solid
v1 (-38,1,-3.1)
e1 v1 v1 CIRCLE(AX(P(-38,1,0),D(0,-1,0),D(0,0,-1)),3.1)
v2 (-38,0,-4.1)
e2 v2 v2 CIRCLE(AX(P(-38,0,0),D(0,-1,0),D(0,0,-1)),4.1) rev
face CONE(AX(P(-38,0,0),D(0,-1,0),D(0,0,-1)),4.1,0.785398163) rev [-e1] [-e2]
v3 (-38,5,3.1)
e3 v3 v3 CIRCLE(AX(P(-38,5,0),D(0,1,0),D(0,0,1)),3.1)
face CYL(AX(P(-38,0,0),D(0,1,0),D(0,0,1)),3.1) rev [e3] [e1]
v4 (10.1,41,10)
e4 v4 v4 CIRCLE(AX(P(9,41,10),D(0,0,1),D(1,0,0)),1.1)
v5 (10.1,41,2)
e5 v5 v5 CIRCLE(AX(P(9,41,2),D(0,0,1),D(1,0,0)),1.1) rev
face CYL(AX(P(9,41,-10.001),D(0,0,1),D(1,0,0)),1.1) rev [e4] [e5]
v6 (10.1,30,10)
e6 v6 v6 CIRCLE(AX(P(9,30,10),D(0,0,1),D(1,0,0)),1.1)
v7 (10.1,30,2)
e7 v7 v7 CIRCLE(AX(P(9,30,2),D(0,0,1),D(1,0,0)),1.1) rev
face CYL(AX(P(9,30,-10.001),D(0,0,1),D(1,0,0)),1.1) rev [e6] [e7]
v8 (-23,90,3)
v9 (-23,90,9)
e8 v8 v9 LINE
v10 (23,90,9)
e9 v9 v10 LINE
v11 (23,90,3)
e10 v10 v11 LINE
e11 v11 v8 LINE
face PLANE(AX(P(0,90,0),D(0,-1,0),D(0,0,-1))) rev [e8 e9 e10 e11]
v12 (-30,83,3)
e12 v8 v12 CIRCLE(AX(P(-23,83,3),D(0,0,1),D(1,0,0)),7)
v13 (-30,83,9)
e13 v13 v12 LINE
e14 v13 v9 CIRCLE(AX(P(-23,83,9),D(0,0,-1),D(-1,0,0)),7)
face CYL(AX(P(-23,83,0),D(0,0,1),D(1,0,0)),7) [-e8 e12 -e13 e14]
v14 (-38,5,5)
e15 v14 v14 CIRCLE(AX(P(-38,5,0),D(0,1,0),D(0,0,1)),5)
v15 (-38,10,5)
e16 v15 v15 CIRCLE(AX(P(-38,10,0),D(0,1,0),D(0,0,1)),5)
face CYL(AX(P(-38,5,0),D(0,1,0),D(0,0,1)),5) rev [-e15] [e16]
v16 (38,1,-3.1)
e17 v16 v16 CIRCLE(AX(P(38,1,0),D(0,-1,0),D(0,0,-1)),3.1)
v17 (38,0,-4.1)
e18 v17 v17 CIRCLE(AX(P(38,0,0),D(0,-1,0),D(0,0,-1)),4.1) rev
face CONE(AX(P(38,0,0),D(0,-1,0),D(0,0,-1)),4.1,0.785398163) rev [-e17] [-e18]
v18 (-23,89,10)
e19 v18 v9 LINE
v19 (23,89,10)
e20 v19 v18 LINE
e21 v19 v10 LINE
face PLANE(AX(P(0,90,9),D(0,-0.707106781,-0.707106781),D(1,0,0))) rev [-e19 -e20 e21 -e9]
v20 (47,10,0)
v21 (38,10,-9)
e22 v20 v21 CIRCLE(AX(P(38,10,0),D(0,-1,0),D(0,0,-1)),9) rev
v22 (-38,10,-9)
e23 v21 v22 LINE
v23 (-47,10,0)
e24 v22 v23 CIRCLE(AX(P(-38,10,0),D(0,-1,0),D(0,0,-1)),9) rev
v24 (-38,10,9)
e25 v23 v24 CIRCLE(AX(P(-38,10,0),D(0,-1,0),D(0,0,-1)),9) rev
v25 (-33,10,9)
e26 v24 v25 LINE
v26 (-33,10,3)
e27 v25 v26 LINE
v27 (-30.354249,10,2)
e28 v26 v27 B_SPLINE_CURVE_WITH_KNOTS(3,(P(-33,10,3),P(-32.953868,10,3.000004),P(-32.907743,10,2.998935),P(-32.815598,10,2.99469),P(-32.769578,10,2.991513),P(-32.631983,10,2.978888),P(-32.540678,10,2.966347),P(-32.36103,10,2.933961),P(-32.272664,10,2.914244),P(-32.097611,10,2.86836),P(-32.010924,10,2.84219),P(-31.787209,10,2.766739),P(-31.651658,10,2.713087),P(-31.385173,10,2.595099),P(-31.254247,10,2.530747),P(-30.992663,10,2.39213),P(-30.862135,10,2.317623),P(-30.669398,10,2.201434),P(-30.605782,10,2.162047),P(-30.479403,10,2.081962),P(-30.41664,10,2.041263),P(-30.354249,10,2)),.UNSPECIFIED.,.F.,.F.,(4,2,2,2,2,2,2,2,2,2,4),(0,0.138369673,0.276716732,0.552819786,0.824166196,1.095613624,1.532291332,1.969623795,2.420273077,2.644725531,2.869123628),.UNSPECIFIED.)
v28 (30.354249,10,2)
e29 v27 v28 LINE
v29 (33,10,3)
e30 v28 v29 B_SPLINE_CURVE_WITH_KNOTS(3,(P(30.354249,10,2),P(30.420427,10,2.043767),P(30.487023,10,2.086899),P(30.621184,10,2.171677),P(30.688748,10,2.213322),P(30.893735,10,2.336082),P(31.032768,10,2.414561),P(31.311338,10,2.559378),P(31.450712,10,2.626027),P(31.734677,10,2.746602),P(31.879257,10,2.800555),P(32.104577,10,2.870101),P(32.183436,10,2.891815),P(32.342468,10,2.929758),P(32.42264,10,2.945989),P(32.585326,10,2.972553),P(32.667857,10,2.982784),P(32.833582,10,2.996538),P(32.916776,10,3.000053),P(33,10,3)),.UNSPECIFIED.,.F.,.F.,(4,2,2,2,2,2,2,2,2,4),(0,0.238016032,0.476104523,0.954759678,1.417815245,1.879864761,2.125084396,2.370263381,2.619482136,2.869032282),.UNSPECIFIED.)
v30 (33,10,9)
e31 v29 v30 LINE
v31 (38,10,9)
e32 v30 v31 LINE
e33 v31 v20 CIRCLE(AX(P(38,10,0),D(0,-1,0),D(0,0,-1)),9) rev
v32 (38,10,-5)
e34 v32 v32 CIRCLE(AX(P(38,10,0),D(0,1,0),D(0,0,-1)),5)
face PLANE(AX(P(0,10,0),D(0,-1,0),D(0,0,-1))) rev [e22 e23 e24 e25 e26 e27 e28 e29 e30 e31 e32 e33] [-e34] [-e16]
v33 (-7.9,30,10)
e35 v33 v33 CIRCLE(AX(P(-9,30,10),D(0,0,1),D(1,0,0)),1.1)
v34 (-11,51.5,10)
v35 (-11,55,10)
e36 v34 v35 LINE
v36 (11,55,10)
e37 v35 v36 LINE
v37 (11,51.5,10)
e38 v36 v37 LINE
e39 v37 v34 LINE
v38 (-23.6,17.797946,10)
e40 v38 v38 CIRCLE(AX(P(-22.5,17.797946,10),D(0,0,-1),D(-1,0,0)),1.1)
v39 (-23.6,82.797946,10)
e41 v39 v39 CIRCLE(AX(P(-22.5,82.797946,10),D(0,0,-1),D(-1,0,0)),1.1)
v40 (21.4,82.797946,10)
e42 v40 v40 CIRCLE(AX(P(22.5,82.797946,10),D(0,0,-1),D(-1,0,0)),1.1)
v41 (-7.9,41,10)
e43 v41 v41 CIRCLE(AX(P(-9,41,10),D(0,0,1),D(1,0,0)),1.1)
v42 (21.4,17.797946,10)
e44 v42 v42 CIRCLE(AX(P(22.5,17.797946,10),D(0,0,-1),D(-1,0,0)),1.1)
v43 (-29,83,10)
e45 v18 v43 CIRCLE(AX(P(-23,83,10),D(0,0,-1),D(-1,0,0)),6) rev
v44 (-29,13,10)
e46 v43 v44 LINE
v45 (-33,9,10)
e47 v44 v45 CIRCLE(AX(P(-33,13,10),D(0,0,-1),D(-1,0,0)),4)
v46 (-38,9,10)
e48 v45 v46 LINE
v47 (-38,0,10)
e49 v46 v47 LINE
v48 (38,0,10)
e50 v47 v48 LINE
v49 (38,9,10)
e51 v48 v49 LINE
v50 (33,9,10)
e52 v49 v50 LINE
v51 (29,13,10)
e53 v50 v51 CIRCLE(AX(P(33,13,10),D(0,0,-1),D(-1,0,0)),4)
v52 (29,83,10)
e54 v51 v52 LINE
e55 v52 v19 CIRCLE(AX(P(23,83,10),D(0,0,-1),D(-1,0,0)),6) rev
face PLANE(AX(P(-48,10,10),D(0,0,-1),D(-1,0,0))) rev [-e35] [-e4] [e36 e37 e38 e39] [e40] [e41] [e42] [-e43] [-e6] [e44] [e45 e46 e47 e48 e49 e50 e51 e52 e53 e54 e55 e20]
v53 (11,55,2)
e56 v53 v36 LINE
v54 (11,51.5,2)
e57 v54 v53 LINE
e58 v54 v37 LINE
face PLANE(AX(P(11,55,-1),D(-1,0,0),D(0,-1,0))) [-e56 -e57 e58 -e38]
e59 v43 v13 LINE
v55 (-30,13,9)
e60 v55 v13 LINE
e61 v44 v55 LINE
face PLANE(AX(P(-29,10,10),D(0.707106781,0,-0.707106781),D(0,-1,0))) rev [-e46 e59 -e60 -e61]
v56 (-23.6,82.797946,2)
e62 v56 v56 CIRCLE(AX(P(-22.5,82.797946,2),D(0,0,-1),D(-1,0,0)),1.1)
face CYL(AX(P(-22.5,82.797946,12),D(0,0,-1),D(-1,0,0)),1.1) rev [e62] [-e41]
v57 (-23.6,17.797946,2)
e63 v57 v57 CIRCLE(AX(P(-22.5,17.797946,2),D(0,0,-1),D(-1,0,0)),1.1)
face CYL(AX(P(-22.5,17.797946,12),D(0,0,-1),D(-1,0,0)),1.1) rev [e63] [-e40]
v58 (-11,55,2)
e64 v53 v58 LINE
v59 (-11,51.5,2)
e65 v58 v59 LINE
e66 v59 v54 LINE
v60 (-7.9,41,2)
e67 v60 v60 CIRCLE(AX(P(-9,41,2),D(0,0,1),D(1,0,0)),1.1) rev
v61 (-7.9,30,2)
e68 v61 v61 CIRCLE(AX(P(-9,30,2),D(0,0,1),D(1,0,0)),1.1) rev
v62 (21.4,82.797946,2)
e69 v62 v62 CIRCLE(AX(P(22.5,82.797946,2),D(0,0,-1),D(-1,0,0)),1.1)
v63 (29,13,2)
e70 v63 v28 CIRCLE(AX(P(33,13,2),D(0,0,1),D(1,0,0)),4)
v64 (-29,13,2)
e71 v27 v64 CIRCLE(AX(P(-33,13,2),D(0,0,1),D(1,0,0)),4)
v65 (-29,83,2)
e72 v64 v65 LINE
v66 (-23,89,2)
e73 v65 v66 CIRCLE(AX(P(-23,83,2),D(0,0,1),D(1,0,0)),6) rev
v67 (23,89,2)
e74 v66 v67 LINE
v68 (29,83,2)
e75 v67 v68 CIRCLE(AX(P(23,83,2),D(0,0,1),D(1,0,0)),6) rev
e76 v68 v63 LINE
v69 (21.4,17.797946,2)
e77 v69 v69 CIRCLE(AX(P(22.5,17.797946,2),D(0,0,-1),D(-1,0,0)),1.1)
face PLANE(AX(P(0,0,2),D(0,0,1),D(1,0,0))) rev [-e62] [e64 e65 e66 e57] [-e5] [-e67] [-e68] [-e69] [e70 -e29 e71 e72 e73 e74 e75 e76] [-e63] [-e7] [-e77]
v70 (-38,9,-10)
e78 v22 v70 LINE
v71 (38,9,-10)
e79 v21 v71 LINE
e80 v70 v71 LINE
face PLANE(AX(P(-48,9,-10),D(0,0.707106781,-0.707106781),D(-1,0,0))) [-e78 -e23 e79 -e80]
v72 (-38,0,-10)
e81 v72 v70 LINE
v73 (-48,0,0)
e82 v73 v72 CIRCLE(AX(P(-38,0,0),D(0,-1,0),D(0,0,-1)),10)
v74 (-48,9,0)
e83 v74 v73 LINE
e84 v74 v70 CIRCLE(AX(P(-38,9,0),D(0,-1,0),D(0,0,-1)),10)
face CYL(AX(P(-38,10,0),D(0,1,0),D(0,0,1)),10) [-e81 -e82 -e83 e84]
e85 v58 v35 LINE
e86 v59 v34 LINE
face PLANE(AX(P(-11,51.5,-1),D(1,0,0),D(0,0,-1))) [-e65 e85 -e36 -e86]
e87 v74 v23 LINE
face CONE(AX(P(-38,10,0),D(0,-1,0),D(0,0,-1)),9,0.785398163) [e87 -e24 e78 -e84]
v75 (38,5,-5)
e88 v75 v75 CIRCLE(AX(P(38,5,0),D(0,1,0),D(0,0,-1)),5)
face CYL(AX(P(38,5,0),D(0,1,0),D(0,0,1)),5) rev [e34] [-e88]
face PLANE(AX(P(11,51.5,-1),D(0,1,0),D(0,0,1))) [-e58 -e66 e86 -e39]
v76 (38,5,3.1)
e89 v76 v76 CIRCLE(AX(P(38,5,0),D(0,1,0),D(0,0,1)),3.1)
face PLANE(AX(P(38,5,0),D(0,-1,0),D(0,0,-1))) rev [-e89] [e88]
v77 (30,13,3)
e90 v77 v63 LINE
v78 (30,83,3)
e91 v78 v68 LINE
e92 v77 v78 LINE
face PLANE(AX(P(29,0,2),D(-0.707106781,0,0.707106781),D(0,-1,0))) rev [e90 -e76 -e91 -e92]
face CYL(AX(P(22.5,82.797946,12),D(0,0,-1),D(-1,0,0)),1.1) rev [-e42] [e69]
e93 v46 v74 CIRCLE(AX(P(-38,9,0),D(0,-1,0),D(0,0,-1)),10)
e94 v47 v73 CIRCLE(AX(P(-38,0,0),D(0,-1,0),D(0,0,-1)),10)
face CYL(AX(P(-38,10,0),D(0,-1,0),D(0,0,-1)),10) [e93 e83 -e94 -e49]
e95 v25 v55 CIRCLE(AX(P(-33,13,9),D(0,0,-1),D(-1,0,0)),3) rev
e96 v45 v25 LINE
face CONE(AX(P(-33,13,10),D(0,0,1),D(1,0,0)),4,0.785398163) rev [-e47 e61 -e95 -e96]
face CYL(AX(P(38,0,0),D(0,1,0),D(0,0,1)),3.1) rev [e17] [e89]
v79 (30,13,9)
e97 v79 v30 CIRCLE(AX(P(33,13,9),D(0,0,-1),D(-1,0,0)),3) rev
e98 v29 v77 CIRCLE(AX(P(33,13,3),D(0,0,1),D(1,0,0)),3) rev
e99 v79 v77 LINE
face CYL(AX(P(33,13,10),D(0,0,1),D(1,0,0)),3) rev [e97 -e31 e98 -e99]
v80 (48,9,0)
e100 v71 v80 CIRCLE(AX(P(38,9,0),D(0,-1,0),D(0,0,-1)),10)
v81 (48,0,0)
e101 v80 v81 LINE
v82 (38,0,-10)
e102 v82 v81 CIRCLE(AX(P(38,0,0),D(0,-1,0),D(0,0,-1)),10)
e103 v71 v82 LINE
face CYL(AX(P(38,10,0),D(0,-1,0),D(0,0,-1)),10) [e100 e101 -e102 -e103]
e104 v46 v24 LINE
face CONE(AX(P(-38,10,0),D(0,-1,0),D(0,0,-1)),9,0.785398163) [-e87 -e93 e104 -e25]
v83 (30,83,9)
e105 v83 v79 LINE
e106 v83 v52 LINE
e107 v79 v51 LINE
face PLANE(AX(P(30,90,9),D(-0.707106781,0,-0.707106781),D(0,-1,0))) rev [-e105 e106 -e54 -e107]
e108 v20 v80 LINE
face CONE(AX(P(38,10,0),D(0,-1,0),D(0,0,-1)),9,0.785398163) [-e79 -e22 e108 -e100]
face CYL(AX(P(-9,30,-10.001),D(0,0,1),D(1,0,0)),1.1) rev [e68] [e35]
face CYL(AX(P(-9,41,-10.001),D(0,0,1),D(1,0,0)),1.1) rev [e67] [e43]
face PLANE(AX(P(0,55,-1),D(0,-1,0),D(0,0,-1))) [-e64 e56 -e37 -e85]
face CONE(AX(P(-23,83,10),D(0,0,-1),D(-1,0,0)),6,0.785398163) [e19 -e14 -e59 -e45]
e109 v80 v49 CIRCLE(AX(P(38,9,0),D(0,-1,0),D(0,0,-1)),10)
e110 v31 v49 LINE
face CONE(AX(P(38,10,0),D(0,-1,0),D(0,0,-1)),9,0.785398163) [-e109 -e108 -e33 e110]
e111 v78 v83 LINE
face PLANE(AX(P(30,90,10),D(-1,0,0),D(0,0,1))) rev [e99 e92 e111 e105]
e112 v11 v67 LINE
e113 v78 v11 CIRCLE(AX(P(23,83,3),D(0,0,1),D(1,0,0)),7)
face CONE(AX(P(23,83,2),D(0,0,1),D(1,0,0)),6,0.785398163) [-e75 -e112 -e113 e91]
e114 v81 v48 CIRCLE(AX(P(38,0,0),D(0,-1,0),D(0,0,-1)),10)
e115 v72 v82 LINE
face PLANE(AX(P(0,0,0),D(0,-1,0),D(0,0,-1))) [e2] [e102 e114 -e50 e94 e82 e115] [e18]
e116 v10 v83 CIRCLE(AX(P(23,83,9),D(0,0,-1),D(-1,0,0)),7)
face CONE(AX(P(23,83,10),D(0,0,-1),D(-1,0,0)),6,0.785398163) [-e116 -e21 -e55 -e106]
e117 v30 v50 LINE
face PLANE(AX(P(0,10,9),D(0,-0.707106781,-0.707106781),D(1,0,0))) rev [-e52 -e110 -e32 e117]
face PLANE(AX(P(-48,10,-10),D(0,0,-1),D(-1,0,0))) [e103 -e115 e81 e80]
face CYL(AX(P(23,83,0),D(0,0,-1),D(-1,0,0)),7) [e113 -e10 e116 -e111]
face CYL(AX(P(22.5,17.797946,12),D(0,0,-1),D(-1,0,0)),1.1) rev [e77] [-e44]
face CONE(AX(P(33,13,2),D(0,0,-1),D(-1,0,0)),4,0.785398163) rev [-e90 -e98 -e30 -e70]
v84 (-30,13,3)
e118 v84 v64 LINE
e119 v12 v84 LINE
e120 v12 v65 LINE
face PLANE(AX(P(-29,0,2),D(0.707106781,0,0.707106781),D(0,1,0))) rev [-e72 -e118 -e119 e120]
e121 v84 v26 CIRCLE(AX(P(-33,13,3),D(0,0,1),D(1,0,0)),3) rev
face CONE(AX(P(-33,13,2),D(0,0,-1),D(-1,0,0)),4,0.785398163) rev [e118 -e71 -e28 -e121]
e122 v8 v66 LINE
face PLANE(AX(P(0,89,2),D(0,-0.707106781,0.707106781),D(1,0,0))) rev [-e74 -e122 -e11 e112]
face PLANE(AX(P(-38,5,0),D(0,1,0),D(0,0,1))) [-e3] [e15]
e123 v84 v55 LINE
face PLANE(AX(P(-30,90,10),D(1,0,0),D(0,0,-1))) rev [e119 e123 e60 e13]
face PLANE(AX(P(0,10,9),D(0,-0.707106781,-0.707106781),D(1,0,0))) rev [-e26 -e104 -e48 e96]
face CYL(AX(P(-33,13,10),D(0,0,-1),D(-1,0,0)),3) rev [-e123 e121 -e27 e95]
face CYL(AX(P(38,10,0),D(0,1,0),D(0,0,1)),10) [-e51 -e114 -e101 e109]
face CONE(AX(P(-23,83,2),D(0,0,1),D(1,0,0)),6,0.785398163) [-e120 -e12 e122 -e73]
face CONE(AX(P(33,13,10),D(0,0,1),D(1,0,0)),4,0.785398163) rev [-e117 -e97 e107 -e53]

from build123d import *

# Parameters (mm, degrees)
SKETCH_1_W          = 96
SKETCH_1_H          = 20
EXTRUDE_1_DEPTH     = 10
SKETCH_2_R          = 5
CUT_EXTRUDE_1_DEPTH = 5
FILLET_1_R          = 10
SKETCH_3_R          = 3.1
CUT_EXTRUDE_2_DEPTH = 5
CHAMFER_1_SIZE      = 1
SKETCH_4_W          = 60
SKETCH_4_H          = 20
EXTRUDE_2_DEPTH     = 80
CUT_EXTRUDE_4_REACH = 105.942
SKETCH_6_R          = 1.1
CUT_EXTRUDE_5_DEPTH = 11
SKETCH_8_W          = 60
SKETCH_8_H          = 102
CUT_EXTRUDE_6_DEPTH = 12
SKETCH_9_R          = 1.1
CUT_EXTRUDE_7_DEPTH = 10
FILLET_8_R          = 7
SKETCH_10_W         = 12
SKETCH_10_H         = 10
EXTRUDE_3_DEPTH     = 60
FILLET_11_R         = 3
CHAMFER_4_SIZE      = 1


with BuildPart() as part:
    # 草图1 → 凸台-拉伸1 (new body)
    with BuildSketch(Plane(origin=(0, 0, 0), x_dir=(1, 0, 0), z_dir=(0, 1, 0))):
        Rectangle(SKETCH_1_W, SKETCH_1_H)
    extrude(amount=EXTRUDE_1_DEPTH)

    # 草图2 → 切除-拉伸1 (cut)
    with BuildSketch(Plane(origin=(0, 10, 0), x_dir=(1, 0, 0), z_dir=(0, 1, 0))):
        with Locations(Location((-38, 0, 0), (0, 0, 270))):
            Circle(SKETCH_2_R)
        with Locations(Location((38, 0, 0), (0, 0, 90))):
            Circle(SKETCH_2_R)
    extrude(amount=-CUT_EXTRUDE_1_DEPTH, mode=Mode.SUBTRACT)

    # 圆角1
    fillet_1_edges = [part.edges().sort_by_distance(p)[0] for p in [
        (48, 5, -10),
        (48, 5, 10),
        (-48, 5, 10),
        (-48, 5, -10),
    ]]
    fillet(fillet_1_edges, radius=FILLET_1_R - 0.0001)  # a hair under: the kernel refuses the full size

    # 草图3 → 切除-拉伸2 (cut)
    with BuildSketch(Plane(origin=(0, 5, 0), x_dir=(1, 0, 0), z_dir=(0, 1, 0))):
        with Locations(Location((-38, 0, 0), (0, 0, 270))):
            Circle(SKETCH_3_R)
        with Locations(Location((38, 0, 0), (0, 0, 270))):
            Circle(SKETCH_3_R)
    extrude(amount=-CUT_EXTRUDE_2_DEPTH, mode=Mode.SUBTRACT)

    # 倒角1
    chamfer_1_edges = [part.edges().sort_by_distance(p)[0] for p in [
        (-38, 0, -3.1),
        (38, 0, -3.1),
    ]]
    chamfer(chamfer_1_edges, length=CHAMFER_1_SIZE)

    # 草图4 → 凸台-拉伸2 (add)
    with BuildSketch(Plane(origin=(0, 10, 0), x_dir=(1, 0, 0), z_dir=(0, 1, 0))):
        Rectangle(SKETCH_4_W, SKETCH_4_H)
    extrude(amount=EXTRUDE_2_DEPTH)

    # 草图6 → 切除-拉伸4 (cut, up to next)
    with BuildSketch(Plane.XY.offset(10), mode=Mode.PRIVATE) as cut_extrude_4_sk1:
        with Locations((-9, 41)):
            Circle(SKETCH_6_R)
    cut_extrude_4_tool1 = extrude(cut_extrude_4_sk1.sketch, amount=-CUT_EXTRUDE_4_REACH, mode=Mode.PRIVATE) & part.part
    # 草图6 → 切除-拉伸4 (cut, up to next)
    with BuildSketch(Plane.XY.offset(10), mode=Mode.PRIVATE) as cut_extrude_4_sk2:
        with Locations((9, 41)):
            Circle(SKETCH_6_R)
    cut_extrude_4_tool2 = extrude(cut_extrude_4_sk2.sketch, amount=-CUT_EXTRUDE_4_REACH, mode=Mode.PRIVATE) & part.part
    # 草图6 → 切除-拉伸4 (cut, up to next)
    with BuildSketch(Plane.XY.offset(10), mode=Mode.PRIVATE) as cut_extrude_4_sk3:
        with Locations((9, 30)):
            Circle(SKETCH_6_R)
    cut_extrude_4_tool3 = extrude(cut_extrude_4_sk3.sketch, amount=-CUT_EXTRUDE_4_REACH, mode=Mode.PRIVATE) & part.part
    # 草图6 → 切除-拉伸4 (cut, up to next)
    with BuildSketch(Plane.XY.offset(10), mode=Mode.PRIVATE) as cut_extrude_4_sk4:
        with Locations((-9, 30)):
            Circle(SKETCH_6_R)
    cut_extrude_4_tool4 = extrude(cut_extrude_4_sk4.sketch, amount=-CUT_EXTRUDE_4_REACH, mode=Mode.PRIVATE) & part.part
    add(cut_extrude_4_tool1.solids().sort_by_distance((-9, 41, 10))[0], mode=Mode.SUBTRACT)
    add(cut_extrude_4_tool2.solids().sort_by_distance((9, 41, 10))[0], mode=Mode.SUBTRACT)
    add(cut_extrude_4_tool3.solids().sort_by_distance((9, 30, 10))[0], mode=Mode.SUBTRACT)
    add(cut_extrude_4_tool4.solids().sort_by_distance((-9, 30, 10))[0], mode=Mode.SUBTRACT)

    # 草图6<8> → 切除-拉伸5 (cut)
    with BuildSketch(Plane.XY.offset(10)):
        Polygon((0, 55), (11, 55), (11, 51.5), (-11, 51.5), (-11, 55), align=None)
    extrude(amount=-CUT_EXTRUDE_5_DEPTH, mode=Mode.SUBTRACT)

    # 草图8 → 切除-拉伸6 (cut)
    with BuildSketch(Plane(origin=(0, 0, -10), x_dir=(-1, 0, 0), z_dir=(0, 0, -1))):
        with Locations((0, 39)):
            Rectangle(SKETCH_8_W, SKETCH_8_H)
    extrude(amount=-CUT_EXTRUDE_6_DEPTH, mode=Mode.SUBTRACT)

    # 草图9 → 切除-拉伸7 (cut)
    with BuildSketch(Plane(origin=(0, 0, 2), x_dir=(-1, 0, 0), z_dir=(0, 0, -1))):
        with Locations((-22.5, 82.797945994)):
            Circle(SKETCH_9_R)
        with Locations((22.5, 82.797945994)):
            Circle(SKETCH_9_R)
        with Locations((22.5, 17.797945994)):
            Circle(SKETCH_9_R)
        with Locations((-22.5, 17.797945994)):
            Circle(SKETCH_9_R)
    extrude(amount=-CUT_EXTRUDE_7_DEPTH, mode=Mode.SUBTRACT)

    # 圆角8
    fillet_8_edges = [part.edges().sort_by_distance(p)[0] for p in [
        (-30, 90, 6),
        (30, 90, 6),
    ]]
    fillet(fillet_8_edges, radius=FILLET_8_R)

    # 草图10 → 凸台-拉伸3 (add)
    with BuildSketch(Plane.ZY.offset(-30)):
        with Locations((-4, 5)):
            Rectangle(SKETCH_10_W, SKETCH_10_H)
    extrude(amount=EXTRUDE_3_DEPTH)

    # 圆角11
    fillet_11_edges = [part.edges().sort_by_distance(p)[0] for p in [
        (-30, 10, 6),
        (30, 10, 6),
    ]]
    fillet(fillet_11_edges, radius=FILLET_11_R)

    # 倒角4
    chamfer_4_edges = [part.edges().sort_by_distance(p)[0] for p in [
        (0, 90, 2),
        (0, 90, 10),
        (30, 48, 10),
        (-30, 48, 10),
        (27.949747468, 87.949747468, 10),
        (-27.949747468, 87.949747468, 10),
        (30, 48, 2),
        (27.949747468, 87.949747468, 2),
        (-27.949747468, 87.949747468, 2),
        (-30, 48, 2),
        (35.50005, 10, 10),
        (-30.878679656, 10.878679656, 10),
        (-30.878679656, 10.878679656, 2),
        (30.878679656, 10.878679656, 2),
        (30.878679656, 10.878679656, 10),
        (0, 10, -10),
        (-35.50005, 10, 10),
        (-45.071097101, 10, -7.071097101),
        (-45.071097101, 10, 7.071097101),
        (45.071097101, 10, 7.071097101),
        (45.071097101, 10, -7.071097101),
    ]]
    chamfer(chamfer_4_edges, length=CHAMFER_4_SIZE)


solid = part.part
